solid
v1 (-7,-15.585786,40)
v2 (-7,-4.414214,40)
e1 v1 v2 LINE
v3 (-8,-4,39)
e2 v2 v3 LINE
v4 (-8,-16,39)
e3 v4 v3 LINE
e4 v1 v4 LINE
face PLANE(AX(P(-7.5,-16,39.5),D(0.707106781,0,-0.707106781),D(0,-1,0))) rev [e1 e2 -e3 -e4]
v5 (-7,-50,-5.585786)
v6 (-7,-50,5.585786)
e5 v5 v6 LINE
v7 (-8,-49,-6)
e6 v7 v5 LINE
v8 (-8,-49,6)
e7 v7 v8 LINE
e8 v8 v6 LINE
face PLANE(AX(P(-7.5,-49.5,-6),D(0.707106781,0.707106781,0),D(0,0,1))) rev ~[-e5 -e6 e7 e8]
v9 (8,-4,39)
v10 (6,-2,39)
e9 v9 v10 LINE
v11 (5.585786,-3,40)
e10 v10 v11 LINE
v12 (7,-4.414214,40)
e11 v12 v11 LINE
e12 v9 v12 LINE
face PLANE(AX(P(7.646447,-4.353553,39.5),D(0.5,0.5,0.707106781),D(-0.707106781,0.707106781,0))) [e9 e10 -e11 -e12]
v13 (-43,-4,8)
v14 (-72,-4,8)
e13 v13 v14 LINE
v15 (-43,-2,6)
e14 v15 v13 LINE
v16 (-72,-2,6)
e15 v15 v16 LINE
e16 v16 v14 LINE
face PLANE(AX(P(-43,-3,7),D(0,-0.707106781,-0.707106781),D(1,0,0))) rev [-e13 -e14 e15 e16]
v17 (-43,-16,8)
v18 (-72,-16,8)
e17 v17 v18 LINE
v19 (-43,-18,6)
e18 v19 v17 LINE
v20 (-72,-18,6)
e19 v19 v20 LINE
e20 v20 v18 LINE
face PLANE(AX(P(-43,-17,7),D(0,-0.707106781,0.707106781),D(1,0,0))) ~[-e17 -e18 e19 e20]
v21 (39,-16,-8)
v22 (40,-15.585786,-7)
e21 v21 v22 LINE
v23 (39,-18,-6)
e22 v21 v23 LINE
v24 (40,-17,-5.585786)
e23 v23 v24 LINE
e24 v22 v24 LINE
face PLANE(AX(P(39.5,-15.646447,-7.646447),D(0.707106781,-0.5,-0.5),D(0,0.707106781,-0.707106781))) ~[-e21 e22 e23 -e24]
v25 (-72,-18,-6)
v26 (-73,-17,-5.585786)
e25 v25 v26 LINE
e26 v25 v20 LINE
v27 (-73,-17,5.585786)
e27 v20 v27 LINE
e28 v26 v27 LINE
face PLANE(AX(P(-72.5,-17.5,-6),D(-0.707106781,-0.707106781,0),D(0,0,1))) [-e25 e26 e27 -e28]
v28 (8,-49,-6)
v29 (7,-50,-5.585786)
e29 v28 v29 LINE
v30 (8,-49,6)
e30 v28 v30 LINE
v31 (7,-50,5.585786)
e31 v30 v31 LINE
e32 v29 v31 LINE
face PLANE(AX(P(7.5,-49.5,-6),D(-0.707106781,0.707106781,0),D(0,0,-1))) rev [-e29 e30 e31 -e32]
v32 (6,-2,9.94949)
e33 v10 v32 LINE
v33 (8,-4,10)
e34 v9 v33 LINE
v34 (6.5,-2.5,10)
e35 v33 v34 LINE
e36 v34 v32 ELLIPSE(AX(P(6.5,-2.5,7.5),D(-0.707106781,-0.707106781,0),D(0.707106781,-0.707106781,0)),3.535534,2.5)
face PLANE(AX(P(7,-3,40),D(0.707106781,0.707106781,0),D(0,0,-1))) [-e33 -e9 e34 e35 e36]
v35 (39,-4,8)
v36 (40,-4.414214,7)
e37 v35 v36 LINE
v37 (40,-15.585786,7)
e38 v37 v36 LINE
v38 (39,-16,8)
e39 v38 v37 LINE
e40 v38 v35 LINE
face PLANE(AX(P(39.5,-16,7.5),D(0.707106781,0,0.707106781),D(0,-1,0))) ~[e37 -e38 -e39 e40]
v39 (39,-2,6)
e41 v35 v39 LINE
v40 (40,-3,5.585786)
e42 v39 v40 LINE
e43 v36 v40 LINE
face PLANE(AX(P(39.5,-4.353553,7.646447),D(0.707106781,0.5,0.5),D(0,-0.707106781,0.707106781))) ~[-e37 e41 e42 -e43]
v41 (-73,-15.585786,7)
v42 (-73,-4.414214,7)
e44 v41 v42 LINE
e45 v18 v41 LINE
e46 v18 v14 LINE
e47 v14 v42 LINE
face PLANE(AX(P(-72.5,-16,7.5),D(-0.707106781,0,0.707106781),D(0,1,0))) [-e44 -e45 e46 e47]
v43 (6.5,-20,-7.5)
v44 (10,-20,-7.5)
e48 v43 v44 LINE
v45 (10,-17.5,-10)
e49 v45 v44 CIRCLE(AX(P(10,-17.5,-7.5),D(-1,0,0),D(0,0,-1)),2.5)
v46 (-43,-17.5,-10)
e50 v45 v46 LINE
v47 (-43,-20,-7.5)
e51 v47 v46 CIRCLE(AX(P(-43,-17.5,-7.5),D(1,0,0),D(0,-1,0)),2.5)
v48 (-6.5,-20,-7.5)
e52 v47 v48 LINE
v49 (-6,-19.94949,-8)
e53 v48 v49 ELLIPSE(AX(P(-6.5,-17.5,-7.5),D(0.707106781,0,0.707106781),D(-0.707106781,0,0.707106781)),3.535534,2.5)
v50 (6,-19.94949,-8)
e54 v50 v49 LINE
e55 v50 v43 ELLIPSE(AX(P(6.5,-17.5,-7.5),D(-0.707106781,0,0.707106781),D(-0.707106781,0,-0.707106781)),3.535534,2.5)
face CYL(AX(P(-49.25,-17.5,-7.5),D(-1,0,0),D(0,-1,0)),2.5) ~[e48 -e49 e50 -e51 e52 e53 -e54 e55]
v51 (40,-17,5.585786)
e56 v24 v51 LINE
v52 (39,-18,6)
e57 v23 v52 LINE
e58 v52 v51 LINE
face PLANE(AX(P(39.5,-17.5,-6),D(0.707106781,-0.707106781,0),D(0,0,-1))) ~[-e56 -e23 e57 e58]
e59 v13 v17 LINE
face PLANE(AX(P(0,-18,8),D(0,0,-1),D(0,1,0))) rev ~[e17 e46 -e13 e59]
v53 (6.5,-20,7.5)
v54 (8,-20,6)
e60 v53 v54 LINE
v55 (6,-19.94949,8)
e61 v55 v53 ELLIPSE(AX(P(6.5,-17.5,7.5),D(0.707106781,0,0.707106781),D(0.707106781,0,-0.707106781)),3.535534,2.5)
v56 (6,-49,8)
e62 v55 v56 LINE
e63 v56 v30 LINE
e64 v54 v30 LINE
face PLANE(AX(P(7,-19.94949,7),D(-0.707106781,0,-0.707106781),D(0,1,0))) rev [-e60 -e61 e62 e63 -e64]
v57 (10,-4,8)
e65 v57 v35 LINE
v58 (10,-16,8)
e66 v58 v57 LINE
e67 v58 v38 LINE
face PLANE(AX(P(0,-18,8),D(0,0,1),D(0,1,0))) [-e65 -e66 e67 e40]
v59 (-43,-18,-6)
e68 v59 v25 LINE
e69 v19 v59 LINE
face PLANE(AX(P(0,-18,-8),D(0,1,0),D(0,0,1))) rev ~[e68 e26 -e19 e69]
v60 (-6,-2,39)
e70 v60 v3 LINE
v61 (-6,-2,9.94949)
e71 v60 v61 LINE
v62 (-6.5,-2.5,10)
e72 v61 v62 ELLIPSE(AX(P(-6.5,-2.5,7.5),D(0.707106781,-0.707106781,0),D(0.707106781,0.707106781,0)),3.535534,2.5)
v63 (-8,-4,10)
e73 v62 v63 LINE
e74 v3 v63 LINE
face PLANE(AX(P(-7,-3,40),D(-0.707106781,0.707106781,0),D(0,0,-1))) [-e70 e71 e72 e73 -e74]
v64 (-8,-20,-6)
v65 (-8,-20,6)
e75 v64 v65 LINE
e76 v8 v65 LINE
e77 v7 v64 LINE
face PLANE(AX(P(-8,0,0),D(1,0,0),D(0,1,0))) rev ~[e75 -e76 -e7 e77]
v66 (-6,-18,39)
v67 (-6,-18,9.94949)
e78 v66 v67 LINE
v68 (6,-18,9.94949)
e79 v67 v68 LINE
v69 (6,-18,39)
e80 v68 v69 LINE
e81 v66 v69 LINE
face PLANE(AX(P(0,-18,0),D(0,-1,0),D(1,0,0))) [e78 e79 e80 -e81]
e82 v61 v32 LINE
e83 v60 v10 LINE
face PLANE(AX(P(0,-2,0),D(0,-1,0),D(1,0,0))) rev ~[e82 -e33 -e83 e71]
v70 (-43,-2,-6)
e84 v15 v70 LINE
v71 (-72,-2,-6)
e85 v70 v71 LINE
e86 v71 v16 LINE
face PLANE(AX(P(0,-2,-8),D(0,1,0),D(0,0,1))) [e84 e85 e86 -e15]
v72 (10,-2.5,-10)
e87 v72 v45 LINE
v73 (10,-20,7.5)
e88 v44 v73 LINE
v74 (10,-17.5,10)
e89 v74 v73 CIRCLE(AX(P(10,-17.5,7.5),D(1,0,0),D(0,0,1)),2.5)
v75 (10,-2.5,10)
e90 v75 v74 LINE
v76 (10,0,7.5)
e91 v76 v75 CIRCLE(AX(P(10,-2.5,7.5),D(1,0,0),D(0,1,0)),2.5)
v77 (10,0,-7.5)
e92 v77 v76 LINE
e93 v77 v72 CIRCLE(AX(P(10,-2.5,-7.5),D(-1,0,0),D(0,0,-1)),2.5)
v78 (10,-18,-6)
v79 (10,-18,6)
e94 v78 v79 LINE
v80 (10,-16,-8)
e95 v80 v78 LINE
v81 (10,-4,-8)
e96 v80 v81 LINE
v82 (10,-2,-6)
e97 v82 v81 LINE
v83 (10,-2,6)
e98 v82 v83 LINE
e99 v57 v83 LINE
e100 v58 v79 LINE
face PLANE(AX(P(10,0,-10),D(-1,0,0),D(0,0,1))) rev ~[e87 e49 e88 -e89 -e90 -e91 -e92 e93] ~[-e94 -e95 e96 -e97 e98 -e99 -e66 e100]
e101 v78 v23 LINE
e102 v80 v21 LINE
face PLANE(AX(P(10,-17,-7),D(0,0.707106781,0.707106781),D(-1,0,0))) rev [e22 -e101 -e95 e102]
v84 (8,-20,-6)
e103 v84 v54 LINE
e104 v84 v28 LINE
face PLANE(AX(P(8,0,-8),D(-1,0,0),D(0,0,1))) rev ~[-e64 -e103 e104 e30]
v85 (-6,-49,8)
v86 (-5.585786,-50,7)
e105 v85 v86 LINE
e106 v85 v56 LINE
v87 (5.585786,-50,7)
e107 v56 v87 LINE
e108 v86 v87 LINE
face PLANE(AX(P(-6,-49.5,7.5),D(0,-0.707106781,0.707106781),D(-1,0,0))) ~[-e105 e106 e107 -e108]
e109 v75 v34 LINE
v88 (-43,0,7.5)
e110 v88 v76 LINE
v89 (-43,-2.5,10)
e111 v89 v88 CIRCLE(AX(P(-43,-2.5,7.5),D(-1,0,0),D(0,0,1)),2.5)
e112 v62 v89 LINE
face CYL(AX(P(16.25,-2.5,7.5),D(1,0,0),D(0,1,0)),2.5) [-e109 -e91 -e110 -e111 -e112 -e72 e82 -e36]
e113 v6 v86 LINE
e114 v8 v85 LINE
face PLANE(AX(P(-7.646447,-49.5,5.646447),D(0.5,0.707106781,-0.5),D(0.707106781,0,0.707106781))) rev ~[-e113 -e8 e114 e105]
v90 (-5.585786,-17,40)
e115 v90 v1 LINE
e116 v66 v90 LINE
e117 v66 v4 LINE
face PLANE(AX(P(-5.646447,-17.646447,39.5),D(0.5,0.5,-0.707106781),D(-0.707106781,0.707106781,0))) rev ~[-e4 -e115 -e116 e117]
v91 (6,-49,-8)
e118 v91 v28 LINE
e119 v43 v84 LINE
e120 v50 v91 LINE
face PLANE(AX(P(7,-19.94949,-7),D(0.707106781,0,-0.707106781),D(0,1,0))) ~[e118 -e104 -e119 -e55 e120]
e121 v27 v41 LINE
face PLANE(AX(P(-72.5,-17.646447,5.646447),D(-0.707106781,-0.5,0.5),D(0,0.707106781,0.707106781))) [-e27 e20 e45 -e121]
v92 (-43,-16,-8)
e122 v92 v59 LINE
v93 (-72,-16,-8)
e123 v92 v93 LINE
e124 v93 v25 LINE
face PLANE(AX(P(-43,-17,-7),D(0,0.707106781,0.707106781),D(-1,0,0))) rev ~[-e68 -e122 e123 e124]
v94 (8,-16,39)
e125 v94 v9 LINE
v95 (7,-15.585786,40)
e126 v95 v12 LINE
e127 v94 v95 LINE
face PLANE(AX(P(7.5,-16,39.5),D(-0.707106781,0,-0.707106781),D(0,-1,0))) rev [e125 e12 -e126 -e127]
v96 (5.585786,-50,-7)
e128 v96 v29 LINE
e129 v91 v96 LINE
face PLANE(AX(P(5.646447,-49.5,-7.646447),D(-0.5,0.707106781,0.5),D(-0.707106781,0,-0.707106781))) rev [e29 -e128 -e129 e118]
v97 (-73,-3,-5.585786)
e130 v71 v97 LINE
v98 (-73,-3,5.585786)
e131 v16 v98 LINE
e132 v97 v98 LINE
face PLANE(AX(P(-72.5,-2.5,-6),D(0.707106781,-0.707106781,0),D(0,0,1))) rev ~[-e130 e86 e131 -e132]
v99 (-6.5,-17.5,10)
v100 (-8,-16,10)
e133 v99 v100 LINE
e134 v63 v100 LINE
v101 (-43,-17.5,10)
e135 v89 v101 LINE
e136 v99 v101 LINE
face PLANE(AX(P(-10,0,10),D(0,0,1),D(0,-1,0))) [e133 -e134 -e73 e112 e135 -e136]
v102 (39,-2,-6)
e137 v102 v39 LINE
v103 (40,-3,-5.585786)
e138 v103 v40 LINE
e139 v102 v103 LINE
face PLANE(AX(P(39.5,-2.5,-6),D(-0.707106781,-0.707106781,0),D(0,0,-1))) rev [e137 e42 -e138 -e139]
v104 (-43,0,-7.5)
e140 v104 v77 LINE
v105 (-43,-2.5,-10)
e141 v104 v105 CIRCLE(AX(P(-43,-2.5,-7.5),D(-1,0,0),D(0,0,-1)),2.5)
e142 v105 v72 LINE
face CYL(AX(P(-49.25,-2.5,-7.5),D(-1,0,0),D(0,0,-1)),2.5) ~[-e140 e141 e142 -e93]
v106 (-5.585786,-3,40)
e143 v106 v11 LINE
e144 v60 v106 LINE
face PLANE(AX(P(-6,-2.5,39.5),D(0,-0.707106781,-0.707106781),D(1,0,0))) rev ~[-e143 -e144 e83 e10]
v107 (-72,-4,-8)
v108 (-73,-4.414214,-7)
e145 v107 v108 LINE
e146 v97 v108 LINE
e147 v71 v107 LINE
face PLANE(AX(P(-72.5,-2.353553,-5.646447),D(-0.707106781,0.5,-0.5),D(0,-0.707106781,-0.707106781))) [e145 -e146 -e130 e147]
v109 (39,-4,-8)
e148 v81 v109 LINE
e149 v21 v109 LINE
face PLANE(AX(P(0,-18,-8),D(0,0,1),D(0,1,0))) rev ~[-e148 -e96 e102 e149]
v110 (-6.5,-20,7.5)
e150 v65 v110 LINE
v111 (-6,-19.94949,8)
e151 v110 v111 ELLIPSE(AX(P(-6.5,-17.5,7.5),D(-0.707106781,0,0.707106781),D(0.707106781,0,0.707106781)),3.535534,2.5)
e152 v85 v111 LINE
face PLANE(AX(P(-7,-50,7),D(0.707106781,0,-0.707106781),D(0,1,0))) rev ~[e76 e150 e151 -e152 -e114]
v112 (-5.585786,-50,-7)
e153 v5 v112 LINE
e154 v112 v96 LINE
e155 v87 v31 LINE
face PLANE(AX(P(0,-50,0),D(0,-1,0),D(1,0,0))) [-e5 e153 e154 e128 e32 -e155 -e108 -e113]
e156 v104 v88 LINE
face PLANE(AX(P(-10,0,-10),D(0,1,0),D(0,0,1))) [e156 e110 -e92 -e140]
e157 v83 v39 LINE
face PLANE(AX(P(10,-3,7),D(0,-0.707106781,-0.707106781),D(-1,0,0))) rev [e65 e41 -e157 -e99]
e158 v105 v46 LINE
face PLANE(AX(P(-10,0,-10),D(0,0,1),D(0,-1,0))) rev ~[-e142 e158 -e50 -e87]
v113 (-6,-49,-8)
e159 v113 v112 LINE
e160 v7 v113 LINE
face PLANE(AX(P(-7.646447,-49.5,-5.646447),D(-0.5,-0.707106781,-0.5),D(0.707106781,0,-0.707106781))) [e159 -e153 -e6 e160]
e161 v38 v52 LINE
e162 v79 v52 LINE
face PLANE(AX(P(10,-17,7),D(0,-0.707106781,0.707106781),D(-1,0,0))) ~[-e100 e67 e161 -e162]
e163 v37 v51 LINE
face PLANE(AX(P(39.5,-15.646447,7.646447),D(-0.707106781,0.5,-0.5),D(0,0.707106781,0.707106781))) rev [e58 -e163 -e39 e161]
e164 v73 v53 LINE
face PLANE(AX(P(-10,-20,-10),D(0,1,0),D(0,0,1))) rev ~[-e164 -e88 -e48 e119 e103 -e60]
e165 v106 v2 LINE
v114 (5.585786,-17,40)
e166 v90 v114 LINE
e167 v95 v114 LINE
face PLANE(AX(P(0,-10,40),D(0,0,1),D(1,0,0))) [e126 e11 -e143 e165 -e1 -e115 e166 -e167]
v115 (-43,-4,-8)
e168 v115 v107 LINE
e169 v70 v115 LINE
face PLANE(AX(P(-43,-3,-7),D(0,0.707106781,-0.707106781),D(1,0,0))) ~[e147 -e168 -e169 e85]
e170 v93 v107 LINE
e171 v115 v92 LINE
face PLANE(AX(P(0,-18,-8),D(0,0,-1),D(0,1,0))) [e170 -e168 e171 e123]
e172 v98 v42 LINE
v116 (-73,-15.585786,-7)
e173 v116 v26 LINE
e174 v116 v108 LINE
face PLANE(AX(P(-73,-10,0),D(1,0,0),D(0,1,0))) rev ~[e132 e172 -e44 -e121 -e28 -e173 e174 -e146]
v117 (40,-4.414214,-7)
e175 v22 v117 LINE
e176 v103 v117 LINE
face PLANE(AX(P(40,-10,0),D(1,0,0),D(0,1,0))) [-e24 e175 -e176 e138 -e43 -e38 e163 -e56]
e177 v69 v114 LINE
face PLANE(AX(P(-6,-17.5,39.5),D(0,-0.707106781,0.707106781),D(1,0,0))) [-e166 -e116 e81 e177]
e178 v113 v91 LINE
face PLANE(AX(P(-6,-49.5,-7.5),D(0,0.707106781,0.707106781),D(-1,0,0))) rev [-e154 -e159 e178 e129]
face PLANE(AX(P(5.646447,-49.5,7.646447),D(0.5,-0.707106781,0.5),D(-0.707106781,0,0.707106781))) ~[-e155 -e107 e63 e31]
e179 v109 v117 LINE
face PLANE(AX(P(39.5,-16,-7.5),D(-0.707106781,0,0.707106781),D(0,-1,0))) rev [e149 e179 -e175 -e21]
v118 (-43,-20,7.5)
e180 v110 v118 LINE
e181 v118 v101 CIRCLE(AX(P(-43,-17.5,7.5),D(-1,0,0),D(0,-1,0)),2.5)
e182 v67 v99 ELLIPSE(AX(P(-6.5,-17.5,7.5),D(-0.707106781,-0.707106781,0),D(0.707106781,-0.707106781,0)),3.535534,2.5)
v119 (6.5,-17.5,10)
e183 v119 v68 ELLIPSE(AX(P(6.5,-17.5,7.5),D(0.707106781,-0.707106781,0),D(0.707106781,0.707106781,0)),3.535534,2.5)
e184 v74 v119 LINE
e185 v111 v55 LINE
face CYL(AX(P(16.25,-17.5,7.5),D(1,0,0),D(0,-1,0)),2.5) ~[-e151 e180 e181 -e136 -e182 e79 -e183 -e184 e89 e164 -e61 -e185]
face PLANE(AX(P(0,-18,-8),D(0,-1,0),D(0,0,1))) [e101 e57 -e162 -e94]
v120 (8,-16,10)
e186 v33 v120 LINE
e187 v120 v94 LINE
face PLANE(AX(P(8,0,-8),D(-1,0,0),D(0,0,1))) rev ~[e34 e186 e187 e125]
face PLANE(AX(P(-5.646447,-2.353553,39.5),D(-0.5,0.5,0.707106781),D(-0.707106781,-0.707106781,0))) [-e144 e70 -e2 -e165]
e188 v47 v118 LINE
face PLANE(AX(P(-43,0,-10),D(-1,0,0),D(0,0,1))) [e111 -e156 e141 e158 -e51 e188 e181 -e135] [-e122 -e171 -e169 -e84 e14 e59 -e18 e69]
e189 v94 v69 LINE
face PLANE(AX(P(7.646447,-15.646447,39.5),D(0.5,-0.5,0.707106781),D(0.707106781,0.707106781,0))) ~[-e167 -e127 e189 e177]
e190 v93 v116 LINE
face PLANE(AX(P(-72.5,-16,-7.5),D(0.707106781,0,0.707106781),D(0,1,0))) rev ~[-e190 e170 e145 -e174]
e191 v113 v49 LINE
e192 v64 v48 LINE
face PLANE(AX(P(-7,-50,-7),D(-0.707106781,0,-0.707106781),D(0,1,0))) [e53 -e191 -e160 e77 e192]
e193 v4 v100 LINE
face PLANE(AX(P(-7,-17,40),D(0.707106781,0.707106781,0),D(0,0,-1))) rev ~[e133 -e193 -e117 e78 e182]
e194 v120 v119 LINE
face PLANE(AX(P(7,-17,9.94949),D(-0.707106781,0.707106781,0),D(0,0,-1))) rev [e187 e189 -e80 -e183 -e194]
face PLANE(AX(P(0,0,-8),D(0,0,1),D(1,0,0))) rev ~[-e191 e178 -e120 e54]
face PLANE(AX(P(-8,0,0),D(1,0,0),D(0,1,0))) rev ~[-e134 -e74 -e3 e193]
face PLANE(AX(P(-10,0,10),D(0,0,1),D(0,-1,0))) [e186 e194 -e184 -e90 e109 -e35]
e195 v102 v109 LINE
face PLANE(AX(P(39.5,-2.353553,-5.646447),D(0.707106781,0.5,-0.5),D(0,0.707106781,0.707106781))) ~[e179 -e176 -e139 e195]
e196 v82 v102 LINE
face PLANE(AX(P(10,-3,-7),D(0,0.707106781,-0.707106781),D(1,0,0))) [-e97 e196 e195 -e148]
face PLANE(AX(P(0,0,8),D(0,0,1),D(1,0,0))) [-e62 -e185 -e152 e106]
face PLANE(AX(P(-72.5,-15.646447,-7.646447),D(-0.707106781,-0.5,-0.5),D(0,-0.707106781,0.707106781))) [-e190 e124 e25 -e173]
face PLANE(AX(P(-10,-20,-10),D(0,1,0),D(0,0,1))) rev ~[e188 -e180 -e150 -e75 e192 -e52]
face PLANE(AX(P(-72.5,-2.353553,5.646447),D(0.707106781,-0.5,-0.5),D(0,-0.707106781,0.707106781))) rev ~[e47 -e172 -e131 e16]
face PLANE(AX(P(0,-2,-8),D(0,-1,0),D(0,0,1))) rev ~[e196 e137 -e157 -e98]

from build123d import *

# Parameters (mm, degrees)
F0_W          = 16
F0_H          = 16
F1_DEPTH      = 50
F0_W_2        = 20
F0_H_2        = 20
F2_DEPTH      = 20
F3_W          = 16
F3_H          = 16
F4_DEPTH      = 40
F5_W          = 16
F5_H          = 16
F6_DEPTH      = 73
F7_W          = 16
F7_H          = 16
F8_DEPTH      = 40
F9_DEPTH      = 33
F10_T1_DEPTH  = 65.5
F10_T6_DEPTH  = 65.5
F10_T11_DEPTH = 65.5
F10_T17_DEPTH = 65.5
F10_T22_DEPTH = 65.5
F10_T27_DEPTH = 65.5
F10_T32_DEPTH = 65.5
F10_T37_DEPTH = 65.5
F10_T42_DEPTH = 65.5
F10_T47_DEPTH = 65.5
F11_SIZE      = 2
F12_SIZE      = 1


# Not quite as in the source:
# - a fillet or chamfer that OpenCascade refuses, or shapes differently, is made with other operations: its cross-section is extruded or revolved along the edge and cut away or added


with BuildPart() as f1:
    # F0 (on Front) → F1 (new body)
    with BuildSketch(Plane.XZ):
        Rectangle(F0_W, F0_H)
    extrude(amount=F1_DEPTH)

    # F0 (on Front) → F2 (join)
    with BuildSketch(Plane.XZ):
        Rectangle(F0_W_2, F0_H_2)
        Rectangle(F0_W, F0_H, mode=Mode.SUBTRACT)
    extrude(amount=F2_DEPTH)

    # F3 (on Right) → F4 (join)
    with BuildSketch(Plane.YZ):
        with Locations((-10, 0)):
            Rectangle(F3_W, F3_H)
    extrude(amount=F4_DEPTH)

    # F5 (on Right) → F6 (join)
    with BuildSketch(Plane.YZ):
        with Locations((-10, 0)):
            Rectangle(F5_W, F5_H)
    extrude(amount=-F6_DEPTH)

    # F7 (on Top) → F8 (join)
    with BuildSketch(Plane.XY):
        with Locations((0, -10)):
            Rectangle(F7_W, F7_H)
    extrude(amount=F8_DEPTH)

    # F9 (add): a face of the model
    f9_faces = [f1.faces().sort_by_distance(p)[0] for p in [
        (-10, -10, 9.7171572875),
    ]]
    extrude(f9_faces, amount=F9_DEPTH)

    # F10: fillet of radius 2.5 on 4 edges, made by hand

    # F10_s2 → F10_t1 (cut)
    with BuildSketch(Plane.YZ.offset(-49.25)):
        with BuildLine():
            ThreePointArc((-2.5, -10), (-0.732233047, -9.267766953), (0, -7.5))
            Line((0, -7.5), (0, -10))
            Line((0, -10), (-2.5, -10))
        make_face()
    extrude(amount=F10_T1_DEPTH, mode=Mode.SUBTRACT)


with BuildPart() as f10_tool4:
    # F10_s5 → F10_t6 (new body)
    with BuildSketch(Plane.YZ.offset(16.25)):
        with BuildLine():
            ThreePointArc((-20, 7.5), (-19.267766953, 9.267766953), (-17.5, 10))
            Line((-17.5, 10), (-20, 10))
            Line((-20, 10), (-20, 7.5))
        make_face()
    extrude(amount=-F10_T6_DEPTH)

    split(bisect_by=Plane.YZ.offset(8), keep=Keep.TOP)


with BuildPart() as f1_1:
    add(f1.part)

    # F10_t3: cut F10_tool4
    add(f10_tool4.part, mode=Mode.SUBTRACT)


with BuildPart() as f10_tool9:
    # F10_s10 → F10_t11 (new body)
    with BuildSketch(Plane.YZ.offset(16.25)):
        with BuildLine():
            ThreePointArc((-20, 7.5), (-19.267766953, 9.267766953), (-17.5, 10))
            Line((-17.5, 10), (-20, 10))
            Line((-20, 10), (-20, 7.5))
        make_face()
    extrude(amount=-F10_T11_DEPTH)

    split(bisect_by=Plane.XY.offset(8), keep=Keep.TOP)

    split(bisect_by=Plane.XZ.offset(18), keep=Keep.TOP)


with BuildPart() as f1_2:
    add(f1_1.part)

    # F10_t8: cut F10_tool9
    add(f10_tool9.part, mode=Mode.SUBTRACT)


with BuildPart() as f10_tool15:
    # F10_s16 → F10_t17 (new body)
    with BuildSketch(Plane.YZ.offset(16.25)):
        with BuildLine():
            ThreePointArc((-20, 7.5), (-19.267766953, 9.267766953), (-17.5, 10))
            Line((-17.5, 10), (-20, 10))
            Line((-20, 10), (-20, 7.5))
        make_face()
    extrude(amount=-F10_T17_DEPTH)

    split(bisect_by=Plane.YZ.offset(-8), keep=Keep.BOTTOM)


with BuildPart() as f1_3:
    add(f1_2.part)

    # F10_t14: cut F10_tool15
    add(f10_tool15.part, mode=Mode.SUBTRACT)


with BuildPart() as f10_tool20:
    # F10_s21 → F10_t22 (new body)
    with BuildSketch(Plane.YZ.offset(-49.25)):
        with BuildLine():
            ThreePointArc((-20, -7.5), (-19.267766953, -9.267766953), (-17.5, -10))
            Line((-17.5, -10), (-20, -10))
            Line((-20, -10), (-20, -7.5))
        make_face()
    extrude(amount=F10_T22_DEPTH)

    split(bisect_by=Plane.YZ.offset(-8), keep=Keep.BOTTOM)


with BuildPart() as f1_4:
    add(f1_3.part)

    # F10_t19: cut F10_tool20
    add(f10_tool20.part, mode=Mode.SUBTRACT)


with BuildPart() as f10_tool25:
    # F10_s26 → F10_t27 (new body)
    with BuildSketch(Plane.YZ.offset(-49.25)):
        with BuildLine():
            ThreePointArc((-20, -7.5), (-19.267766953, -9.267766953), (-17.5, -10))
            Line((-17.5, -10), (-20, -10))
            Line((-20, -10), (-20, -7.5))
        make_face()
    extrude(amount=F10_T27_DEPTH)

    split(bisect_by=Plane.XY.offset(-8), keep=Keep.BOTTOM)


with BuildPart() as f1_5:
    add(f1_4.part)

    # F10_t24: cut F10_tool25
    add(f10_tool25.part, mode=Mode.SUBTRACT)


with BuildPart() as f10_tool30:
    # F10_s31 → F10_t32 (new body)
    with BuildSketch(Plane.YZ.offset(-49.25)):
        with BuildLine():
            ThreePointArc((-20, -7.5), (-19.267766953, -9.267766953), (-17.5, -10))
            Line((-17.5, -10), (-20, -10))
            Line((-20, -10), (-20, -7.5))
        make_face()
    extrude(amount=F10_T32_DEPTH)

    split(bisect_by=Plane.YZ.offset(8), keep=Keep.TOP)


with BuildPart() as f1_6:
    add(f1_5.part)

    # F10_t29: cut F10_tool30
    add(f10_tool30.part, mode=Mode.SUBTRACT)


with BuildPart() as f10_tool35:
    # F10_s36 → F10_t37 (new body)
    with BuildSketch(Plane.YZ.offset(16.25)):
        with BuildLine():
            ThreePointArc((0, 7.5), (-0.732233047, 9.267766953), (-2.5, 10))
            Line((-2.5, 10), (0, 10))
            Line((0, 10), (0, 7.5))
        make_face()
    extrude(amount=-F10_T37_DEPTH)

    split(bisect_by=Plane.XZ.offset(2), keep=Keep.BOTTOM)


with BuildPart() as f1_7:
    add(f1_6.part)

    # F10_t34: cut F10_tool35
    add(f10_tool35.part, mode=Mode.SUBTRACT)


with BuildPart() as f10_tool40:
    # F10_s41 → F10_t42 (new body)
    with BuildSketch(Plane.YZ.offset(16.25)):
        with BuildLine():
            ThreePointArc((0, 7.5), (-0.732233047, 9.267766953), (-2.5, 10))
            Line((-2.5, 10), (0, 10))
            Line((0, 10), (0, 7.5))
        make_face()
    extrude(amount=-F10_T42_DEPTH)

    split(bisect_by=Plane.YZ.offset(8), keep=Keep.TOP)


with BuildPart() as f1_8:
    add(f1_7.part)

    # F10_t39: cut F10_tool40
    add(f10_tool40.part, mode=Mode.SUBTRACT)


with BuildPart() as f10_tool45:
    # F10_s46 → F10_t47 (new body)
    with BuildSketch(Plane.YZ.offset(16.25)):
        with BuildLine():
            ThreePointArc((0, 7.5), (-0.732233047, 9.267766953), (-2.5, 10))
            Line((-2.5, 10), (0, 10))
            Line((0, 10), (0, 7.5))
        make_face()
    extrude(amount=-F10_T47_DEPTH)

    split(bisect_by=Plane.YZ.offset(-8), keep=Keep.BOTTOM)


with BuildPart() as f1_9:
    add(f1_8.part)

    # F10_t44: cut F10_tool45
    add(f10_tool45.part, mode=Mode.SUBTRACT)

    # F11
    f11_edges = [f1_9.edges().sort_by_distance(p)[0] for p in [
        (-58, -18, 8),
        (-58, -18, -8),
        (-58, -2, 8),
        (-58, -2, -8),
        (-8, -34.974745, 8),
        (-8, -34.974745, -8),
        (8, -34.974745, 8),
        (8, -34.974745, -8),
        (25, -18, -8),
        (25, -18, 8),
        (8, -18, 24.974745),
        (-8, -18, 24.974745),
        (25, -2, -8),
        (25, -2, 8),
        (8, -2, 24.974745),
        (-8, -2, 24.974745),
    ]]
    chamfer(f11_edges, length=F11_SIZE)

    # F12
    f12_edges = [f1_9.edges().sort_by_distance(p)[0] for p in [
        (-73, -10, 8),
        (-73, -10, -8),
        (-73, -17, -7),
        (-73, -3, -7),
        (-73, -18, 0),
        (-73, -2, 0),
        (-73, -17, 7),
        (-73, -3, 7),
        (-8, -50, 0),
        (-7, -50, 7),
        (-7, -50, -7),
        (0, -50, 8),
        (0, -50, -8),
        (7, -50, 7),
        (7, -50, -7),
        (8, -50, 0),
        (-8, -10, 40),
        (-7, -3, 40),
        (-7, -17, 40),
        (0, -2, 40),
        (0, -18, 40),
        (7, -3, 40),
        (7, -17, 40),
        (8, -10, 40),
        (40, -10, -8),
        (40, -17, -7),
        (40, -3, -7),
        (40, -18, 0),
        (40, -2, 0),
        (40, -17, 7),
        (40, -3, 7),
        (40, -10, 8),
    ]]
    chamfer(f12_edges, length=F12_SIZE)


solid = f1_9.part
